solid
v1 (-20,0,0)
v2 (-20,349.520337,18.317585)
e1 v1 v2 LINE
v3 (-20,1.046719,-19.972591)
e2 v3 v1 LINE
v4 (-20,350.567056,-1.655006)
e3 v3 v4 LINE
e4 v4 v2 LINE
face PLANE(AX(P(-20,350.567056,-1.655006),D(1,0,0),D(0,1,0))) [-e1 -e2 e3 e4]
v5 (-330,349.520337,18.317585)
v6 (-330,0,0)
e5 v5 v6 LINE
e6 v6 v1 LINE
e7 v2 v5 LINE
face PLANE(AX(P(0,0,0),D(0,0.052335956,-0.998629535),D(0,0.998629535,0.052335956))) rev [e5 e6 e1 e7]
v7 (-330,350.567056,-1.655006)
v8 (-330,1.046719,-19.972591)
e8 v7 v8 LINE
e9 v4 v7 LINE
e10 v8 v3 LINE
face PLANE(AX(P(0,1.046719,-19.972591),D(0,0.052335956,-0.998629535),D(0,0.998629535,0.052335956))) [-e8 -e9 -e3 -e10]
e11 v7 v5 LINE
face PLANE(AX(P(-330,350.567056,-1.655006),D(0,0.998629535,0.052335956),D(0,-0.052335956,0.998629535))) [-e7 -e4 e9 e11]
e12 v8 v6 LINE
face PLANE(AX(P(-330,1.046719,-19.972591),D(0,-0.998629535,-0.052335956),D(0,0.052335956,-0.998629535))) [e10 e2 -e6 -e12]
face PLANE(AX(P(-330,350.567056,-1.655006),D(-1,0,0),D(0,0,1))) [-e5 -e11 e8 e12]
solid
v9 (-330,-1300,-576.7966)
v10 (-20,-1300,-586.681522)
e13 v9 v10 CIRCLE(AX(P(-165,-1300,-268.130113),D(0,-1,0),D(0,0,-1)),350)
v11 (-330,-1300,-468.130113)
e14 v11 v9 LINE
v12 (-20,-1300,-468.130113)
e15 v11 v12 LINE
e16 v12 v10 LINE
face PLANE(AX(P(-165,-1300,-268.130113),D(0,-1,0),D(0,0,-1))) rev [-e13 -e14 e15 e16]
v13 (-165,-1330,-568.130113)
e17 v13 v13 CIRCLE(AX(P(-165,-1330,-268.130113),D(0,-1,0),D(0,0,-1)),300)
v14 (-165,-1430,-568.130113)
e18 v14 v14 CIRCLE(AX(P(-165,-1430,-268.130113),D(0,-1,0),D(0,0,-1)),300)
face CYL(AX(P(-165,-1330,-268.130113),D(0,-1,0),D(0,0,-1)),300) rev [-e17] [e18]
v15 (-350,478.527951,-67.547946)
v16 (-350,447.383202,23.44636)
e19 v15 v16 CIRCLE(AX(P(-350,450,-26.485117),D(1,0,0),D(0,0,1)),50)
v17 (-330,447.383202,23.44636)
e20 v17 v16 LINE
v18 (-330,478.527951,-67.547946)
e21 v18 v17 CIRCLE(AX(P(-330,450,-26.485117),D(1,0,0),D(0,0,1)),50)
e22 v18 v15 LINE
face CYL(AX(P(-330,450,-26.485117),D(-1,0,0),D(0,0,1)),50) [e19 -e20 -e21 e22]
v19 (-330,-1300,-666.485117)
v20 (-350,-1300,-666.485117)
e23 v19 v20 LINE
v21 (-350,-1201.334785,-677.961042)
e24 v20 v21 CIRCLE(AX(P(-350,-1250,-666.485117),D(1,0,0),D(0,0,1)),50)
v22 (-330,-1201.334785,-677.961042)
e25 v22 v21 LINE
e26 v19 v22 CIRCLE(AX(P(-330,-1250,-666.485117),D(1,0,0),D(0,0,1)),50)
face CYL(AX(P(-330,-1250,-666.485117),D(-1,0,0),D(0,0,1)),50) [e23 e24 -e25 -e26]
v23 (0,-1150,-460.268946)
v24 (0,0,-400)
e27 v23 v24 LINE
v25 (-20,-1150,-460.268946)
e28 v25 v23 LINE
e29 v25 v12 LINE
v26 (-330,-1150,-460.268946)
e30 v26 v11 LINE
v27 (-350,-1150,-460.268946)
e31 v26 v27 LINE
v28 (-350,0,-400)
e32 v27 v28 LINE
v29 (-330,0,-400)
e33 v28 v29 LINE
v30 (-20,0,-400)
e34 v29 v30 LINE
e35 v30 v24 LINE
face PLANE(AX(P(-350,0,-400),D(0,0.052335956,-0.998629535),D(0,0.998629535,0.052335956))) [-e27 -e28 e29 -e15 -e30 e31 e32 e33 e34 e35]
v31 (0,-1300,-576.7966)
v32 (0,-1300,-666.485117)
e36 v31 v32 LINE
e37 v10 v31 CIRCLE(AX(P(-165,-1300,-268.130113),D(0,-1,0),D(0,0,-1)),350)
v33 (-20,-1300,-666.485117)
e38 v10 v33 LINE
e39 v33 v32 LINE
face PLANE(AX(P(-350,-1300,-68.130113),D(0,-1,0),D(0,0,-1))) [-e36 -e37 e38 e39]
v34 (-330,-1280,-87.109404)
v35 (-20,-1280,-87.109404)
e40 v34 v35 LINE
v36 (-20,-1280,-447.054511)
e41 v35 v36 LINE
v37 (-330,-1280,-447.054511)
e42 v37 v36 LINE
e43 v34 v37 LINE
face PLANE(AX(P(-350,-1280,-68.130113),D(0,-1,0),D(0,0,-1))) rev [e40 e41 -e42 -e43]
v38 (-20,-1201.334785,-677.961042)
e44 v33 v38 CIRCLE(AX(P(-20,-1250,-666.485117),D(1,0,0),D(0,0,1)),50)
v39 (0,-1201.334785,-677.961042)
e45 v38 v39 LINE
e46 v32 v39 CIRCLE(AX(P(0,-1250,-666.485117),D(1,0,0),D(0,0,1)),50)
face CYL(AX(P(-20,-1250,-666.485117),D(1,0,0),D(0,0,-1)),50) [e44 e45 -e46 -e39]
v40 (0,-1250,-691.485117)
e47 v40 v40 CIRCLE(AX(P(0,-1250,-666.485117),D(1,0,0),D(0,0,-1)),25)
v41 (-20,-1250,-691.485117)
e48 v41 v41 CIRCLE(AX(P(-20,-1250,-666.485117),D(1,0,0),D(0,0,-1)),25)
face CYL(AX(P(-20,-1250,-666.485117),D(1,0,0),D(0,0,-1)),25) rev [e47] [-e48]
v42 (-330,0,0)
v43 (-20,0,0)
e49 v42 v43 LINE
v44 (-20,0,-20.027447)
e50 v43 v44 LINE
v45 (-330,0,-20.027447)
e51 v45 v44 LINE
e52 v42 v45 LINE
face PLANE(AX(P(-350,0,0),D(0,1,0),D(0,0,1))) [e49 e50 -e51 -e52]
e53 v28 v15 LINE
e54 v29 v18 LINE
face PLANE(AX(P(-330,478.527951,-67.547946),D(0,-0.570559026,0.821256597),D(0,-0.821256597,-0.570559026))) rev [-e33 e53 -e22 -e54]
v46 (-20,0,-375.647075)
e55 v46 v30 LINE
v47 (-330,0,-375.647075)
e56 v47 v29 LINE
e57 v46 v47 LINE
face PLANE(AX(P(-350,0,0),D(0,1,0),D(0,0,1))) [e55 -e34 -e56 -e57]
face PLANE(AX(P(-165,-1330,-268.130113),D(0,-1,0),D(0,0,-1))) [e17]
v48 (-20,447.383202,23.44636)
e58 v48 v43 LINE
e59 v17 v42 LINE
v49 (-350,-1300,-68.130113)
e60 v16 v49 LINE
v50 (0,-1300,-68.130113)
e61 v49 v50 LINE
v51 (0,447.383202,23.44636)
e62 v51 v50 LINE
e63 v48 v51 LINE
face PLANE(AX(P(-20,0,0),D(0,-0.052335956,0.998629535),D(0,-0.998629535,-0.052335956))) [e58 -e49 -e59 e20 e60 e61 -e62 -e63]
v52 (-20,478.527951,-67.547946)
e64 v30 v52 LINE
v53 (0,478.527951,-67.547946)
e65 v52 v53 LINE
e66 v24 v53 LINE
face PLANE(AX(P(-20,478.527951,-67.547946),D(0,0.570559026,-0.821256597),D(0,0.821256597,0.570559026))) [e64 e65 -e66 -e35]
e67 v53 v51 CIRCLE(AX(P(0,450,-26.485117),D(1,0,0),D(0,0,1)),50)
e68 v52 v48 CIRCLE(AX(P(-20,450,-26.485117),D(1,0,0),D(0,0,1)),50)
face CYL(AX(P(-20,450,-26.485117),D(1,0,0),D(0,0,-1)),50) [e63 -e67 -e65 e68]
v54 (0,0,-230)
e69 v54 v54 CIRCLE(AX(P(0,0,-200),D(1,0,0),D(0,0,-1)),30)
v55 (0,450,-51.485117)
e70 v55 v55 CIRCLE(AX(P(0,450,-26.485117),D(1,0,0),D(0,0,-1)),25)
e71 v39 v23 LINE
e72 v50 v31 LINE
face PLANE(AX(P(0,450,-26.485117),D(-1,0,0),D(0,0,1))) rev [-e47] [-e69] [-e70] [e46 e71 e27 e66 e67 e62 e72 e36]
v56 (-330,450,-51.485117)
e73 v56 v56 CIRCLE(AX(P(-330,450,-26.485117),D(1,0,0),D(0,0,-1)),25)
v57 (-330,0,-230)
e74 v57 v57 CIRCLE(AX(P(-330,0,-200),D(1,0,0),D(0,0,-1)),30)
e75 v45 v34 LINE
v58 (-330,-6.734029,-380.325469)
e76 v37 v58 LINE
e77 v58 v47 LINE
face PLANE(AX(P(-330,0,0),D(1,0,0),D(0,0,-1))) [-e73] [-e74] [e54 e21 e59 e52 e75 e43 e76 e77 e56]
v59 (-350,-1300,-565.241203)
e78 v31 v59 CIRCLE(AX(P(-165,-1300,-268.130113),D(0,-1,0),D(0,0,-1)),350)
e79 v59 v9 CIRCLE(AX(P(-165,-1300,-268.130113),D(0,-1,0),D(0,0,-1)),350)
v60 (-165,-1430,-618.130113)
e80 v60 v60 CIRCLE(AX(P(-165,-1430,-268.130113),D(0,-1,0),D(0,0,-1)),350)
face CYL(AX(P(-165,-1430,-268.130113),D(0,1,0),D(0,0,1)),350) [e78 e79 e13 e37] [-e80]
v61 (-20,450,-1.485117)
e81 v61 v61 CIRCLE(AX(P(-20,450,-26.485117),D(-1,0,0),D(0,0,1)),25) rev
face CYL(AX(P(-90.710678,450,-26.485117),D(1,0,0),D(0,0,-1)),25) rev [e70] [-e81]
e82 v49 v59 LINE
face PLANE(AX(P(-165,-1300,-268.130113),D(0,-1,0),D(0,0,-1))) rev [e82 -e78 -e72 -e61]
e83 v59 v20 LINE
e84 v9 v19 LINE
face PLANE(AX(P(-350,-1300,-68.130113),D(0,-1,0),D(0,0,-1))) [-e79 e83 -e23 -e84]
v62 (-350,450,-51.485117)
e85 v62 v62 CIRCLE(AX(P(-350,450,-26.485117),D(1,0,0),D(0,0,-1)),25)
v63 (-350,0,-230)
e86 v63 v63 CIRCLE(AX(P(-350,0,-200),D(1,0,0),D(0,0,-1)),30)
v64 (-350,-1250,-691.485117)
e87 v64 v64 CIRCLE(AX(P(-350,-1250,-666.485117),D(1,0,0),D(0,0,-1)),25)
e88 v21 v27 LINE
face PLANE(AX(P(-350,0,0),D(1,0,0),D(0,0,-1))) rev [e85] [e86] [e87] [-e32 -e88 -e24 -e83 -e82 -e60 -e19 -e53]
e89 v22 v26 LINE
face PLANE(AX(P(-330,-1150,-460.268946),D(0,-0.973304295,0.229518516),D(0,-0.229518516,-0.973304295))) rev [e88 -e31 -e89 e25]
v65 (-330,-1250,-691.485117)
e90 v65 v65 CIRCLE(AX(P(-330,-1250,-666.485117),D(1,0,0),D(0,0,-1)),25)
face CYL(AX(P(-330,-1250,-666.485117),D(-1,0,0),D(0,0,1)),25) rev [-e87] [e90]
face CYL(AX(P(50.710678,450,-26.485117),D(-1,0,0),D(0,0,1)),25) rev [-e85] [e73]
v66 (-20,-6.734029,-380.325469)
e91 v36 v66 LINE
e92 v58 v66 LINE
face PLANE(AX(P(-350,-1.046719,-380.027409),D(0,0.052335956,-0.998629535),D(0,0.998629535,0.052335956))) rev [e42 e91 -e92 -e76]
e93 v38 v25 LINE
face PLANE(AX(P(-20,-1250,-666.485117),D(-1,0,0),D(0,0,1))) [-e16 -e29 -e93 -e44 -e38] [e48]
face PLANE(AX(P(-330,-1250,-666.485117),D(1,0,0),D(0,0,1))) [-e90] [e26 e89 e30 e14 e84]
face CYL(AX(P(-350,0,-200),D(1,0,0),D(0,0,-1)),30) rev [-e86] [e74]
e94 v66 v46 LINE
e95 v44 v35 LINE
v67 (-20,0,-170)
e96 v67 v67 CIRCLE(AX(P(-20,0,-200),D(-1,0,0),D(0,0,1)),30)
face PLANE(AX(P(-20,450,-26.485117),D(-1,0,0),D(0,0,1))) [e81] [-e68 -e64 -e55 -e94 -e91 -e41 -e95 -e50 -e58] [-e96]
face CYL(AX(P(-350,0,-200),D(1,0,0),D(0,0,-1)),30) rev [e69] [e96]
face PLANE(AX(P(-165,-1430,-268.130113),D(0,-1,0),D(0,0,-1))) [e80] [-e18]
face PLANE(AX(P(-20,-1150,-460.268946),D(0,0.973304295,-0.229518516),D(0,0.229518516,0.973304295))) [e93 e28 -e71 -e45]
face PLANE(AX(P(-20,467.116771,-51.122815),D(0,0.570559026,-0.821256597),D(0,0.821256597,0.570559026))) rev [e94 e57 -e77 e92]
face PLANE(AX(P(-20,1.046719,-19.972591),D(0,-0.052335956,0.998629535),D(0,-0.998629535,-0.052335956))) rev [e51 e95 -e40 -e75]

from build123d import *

# Parameters (mm, degrees)
BOSS_EXTRUDE1_DEPTH = 20
BOSS_EXTRUDE2_DEPTH = 350
SHELL1_START        = -330
SHELL1_DEPTH        = 310
SKETCH3_R           = 25
CUT_EXTRUDE1_DEPTH  = 20
SKETCH4_W           = 310
SKETCH4_H           = 350
BOSS_EXTRUDE6_DEPTH = 20
SKETCH5_R           = 25
BOSS_EXTRUDE8_DEPTH = 20
SKETCH6_R           = 30
CUT_EXTRUDE2_DEPTH  = 1526.0740711
SKETCH8_R           = 350
BOSS_EXTRUDE9_DEPTH = 130
SKETCH9_R           = 300
CUT_EXTRUDE3_DEPTH  = 100


# Read off the part's stored shape, not the designer's step: Shell1
with BuildPart() as part:
    # Sketch1 → Boss-Extrude1 (new body)
    with BuildSketch(Plane(origin=(0, 0, 0), x_dir=(0, 0, -1), z_dir=(1, 0, 0))):
        with BuildLine():
            Line((0, 0), (-23.446360115, 447.383202188))
            ThreePointArc((-23.446360115, 447.383202188), (10.293696853, 497.305791674), (67.54794645, 478.527951321))
            Line((67.54794645, 478.527951321), (400, 0))
            Line((400, 0), (0, 0))
        make_face()
    boss_extrude1 = extrude(amount=-BOSS_EXTRUDE1_DEPTH)

    # Sketch2 → Boss-Extrude2 (add)
    with BuildSketch(Plane(origin=(0, 0, 0), x_dir=(0, 0, -1), z_dir=(1, 0, 0))):
        Polygon((0, 0), (400, 0), (468.130113068, -1300), (68.130113068, -1300), align=None)
    extrude(amount=-BOSS_EXTRUDE2_DEPTH)

    # Shell1 outline → Shell1 (cut)
    with BuildSketch(Plane.YZ.offset(SHELL1_START)):
        Polygon((0, -375.647075367), (0, -20.02744692), (-1280, -87.109404402), (-1280, -447.054510562), (-6.734029496, -380.325468612), align=None)
    shell1 = extrude(amount=SHELL1_DEPTH, mode=Mode.SUBTRACT)

    # Sketch3 → Cut-Extrude1 (cut)
    with BuildSketch(Plane(origin=(0, 0, 0), x_dir=(0, 0, -1), z_dir=(1, 0, 0))):
        with Locations((26.485116623, 450)):
            Circle(SKETCH3_R)
    cut_extrude1 = extrude(amount=-CUT_EXTRUDE1_DEPTH, mode=Mode.SUBTRACT)

    # Mirror1: Boss-Extrude1, Shell1, Cut-Extrude1 across plane
    add(boss_extrude1.mirror(Plane(origin=(-175, 0, 0), x_dir=(0, 0, 1), z_dir=(1, 0, 0))))
    add(shell1.mirror(Plane(origin=(-175, 0, 0), x_dir=(0, 0, 1), z_dir=(1, 0, 0))), mode=Mode.SUBTRACT)
    add(cut_extrude1.mirror(Plane(origin=(-175, 0, 0), x_dir=(0, 0, 1), z_dir=(1, 0, 0))), mode=Mode.SUBTRACT)

    # Sketch5 → Boss-Extrude8 (add)
    with BuildSketch(Plane(origin=(0, 0, 0), x_dir=(0, 0, -1), z_dir=(1, 0, 0))):
        with BuildLine():
            Line((468.130113068, -1300), (666.485116623, -1300))
            ThreePointArc((666.485116623, -1300), (716.150299283, -1255.77664533), (677.961042442, -1201.334785251))
            Line((677.961042442, -1201.334785251), (460.268946175, -1150))
            Line((460.268946175, -1150), (468.130113068, -1300))
        make_face()
        with Locations((666.485116623, -1250)):
            Circle(SKETCH5_R, mode=Mode.SUBTRACT)
    boss_extrude8 = extrude(amount=-BOSS_EXTRUDE8_DEPTH)

    # Mirror2: Boss-Extrude8 across plane
    add(boss_extrude8.mirror(Plane(origin=(-175, 0, 0), x_dir=(0, 0, 1), z_dir=(1, 0, 0))))

    # Sketch6 → Cut-Extrude2 (cut, through all)
    with BuildSketch(Plane(origin=(0, 0, 0), x_dir=(0, 0, -1), z_dir=(1, 0, 0))):
        with Locations((200, 0)):
            Circle(SKETCH6_R)
    extrude(amount=-CUT_EXTRUDE2_DEPTH, mode=Mode.SUBTRACT)

    # Sketch8 → Boss-Extrude9 (add)
    with BuildSketch(Plane(origin=(0, -1300, 0), x_dir=(-1, 0, 0), z_dir=(0, -1, 0))):
        with Locations(Location((165, 268.130113068, 0), (0, 0, 58.091017265))):
            Circle(SKETCH8_R)
    extrude(amount=BOSS_EXTRUDE9_DEPTH)

    # Sketch9 → Cut-Extrude3 (cut)
    with BuildSketch(Plane.XZ.offset(1430)):
        with Locations(Location((-165, -268.130113068, 0), (0, 0, 270))):
            Circle(SKETCH9_R)
    extrude(amount=-CUT_EXTRUDE3_DEPTH, mode=Mode.SUBTRACT)


with BuildPart() as body_2:
    # Sketch4 → Boss-Extrude6 (new body)
    with BuildSketch(Plane(origin=(0, 0, 0), x_dir=(1, 0, 0), z_dir=(0, -0.05233595624294052, 0.9986295347545742))):
        with Locations((-175, 175)):
            Rectangle(SKETCH4_W, SKETCH4_H)
    extrude(amount=-BOSS_EXTRUDE6_DEPTH)


solid = Compound([part.part, body_2.part])
